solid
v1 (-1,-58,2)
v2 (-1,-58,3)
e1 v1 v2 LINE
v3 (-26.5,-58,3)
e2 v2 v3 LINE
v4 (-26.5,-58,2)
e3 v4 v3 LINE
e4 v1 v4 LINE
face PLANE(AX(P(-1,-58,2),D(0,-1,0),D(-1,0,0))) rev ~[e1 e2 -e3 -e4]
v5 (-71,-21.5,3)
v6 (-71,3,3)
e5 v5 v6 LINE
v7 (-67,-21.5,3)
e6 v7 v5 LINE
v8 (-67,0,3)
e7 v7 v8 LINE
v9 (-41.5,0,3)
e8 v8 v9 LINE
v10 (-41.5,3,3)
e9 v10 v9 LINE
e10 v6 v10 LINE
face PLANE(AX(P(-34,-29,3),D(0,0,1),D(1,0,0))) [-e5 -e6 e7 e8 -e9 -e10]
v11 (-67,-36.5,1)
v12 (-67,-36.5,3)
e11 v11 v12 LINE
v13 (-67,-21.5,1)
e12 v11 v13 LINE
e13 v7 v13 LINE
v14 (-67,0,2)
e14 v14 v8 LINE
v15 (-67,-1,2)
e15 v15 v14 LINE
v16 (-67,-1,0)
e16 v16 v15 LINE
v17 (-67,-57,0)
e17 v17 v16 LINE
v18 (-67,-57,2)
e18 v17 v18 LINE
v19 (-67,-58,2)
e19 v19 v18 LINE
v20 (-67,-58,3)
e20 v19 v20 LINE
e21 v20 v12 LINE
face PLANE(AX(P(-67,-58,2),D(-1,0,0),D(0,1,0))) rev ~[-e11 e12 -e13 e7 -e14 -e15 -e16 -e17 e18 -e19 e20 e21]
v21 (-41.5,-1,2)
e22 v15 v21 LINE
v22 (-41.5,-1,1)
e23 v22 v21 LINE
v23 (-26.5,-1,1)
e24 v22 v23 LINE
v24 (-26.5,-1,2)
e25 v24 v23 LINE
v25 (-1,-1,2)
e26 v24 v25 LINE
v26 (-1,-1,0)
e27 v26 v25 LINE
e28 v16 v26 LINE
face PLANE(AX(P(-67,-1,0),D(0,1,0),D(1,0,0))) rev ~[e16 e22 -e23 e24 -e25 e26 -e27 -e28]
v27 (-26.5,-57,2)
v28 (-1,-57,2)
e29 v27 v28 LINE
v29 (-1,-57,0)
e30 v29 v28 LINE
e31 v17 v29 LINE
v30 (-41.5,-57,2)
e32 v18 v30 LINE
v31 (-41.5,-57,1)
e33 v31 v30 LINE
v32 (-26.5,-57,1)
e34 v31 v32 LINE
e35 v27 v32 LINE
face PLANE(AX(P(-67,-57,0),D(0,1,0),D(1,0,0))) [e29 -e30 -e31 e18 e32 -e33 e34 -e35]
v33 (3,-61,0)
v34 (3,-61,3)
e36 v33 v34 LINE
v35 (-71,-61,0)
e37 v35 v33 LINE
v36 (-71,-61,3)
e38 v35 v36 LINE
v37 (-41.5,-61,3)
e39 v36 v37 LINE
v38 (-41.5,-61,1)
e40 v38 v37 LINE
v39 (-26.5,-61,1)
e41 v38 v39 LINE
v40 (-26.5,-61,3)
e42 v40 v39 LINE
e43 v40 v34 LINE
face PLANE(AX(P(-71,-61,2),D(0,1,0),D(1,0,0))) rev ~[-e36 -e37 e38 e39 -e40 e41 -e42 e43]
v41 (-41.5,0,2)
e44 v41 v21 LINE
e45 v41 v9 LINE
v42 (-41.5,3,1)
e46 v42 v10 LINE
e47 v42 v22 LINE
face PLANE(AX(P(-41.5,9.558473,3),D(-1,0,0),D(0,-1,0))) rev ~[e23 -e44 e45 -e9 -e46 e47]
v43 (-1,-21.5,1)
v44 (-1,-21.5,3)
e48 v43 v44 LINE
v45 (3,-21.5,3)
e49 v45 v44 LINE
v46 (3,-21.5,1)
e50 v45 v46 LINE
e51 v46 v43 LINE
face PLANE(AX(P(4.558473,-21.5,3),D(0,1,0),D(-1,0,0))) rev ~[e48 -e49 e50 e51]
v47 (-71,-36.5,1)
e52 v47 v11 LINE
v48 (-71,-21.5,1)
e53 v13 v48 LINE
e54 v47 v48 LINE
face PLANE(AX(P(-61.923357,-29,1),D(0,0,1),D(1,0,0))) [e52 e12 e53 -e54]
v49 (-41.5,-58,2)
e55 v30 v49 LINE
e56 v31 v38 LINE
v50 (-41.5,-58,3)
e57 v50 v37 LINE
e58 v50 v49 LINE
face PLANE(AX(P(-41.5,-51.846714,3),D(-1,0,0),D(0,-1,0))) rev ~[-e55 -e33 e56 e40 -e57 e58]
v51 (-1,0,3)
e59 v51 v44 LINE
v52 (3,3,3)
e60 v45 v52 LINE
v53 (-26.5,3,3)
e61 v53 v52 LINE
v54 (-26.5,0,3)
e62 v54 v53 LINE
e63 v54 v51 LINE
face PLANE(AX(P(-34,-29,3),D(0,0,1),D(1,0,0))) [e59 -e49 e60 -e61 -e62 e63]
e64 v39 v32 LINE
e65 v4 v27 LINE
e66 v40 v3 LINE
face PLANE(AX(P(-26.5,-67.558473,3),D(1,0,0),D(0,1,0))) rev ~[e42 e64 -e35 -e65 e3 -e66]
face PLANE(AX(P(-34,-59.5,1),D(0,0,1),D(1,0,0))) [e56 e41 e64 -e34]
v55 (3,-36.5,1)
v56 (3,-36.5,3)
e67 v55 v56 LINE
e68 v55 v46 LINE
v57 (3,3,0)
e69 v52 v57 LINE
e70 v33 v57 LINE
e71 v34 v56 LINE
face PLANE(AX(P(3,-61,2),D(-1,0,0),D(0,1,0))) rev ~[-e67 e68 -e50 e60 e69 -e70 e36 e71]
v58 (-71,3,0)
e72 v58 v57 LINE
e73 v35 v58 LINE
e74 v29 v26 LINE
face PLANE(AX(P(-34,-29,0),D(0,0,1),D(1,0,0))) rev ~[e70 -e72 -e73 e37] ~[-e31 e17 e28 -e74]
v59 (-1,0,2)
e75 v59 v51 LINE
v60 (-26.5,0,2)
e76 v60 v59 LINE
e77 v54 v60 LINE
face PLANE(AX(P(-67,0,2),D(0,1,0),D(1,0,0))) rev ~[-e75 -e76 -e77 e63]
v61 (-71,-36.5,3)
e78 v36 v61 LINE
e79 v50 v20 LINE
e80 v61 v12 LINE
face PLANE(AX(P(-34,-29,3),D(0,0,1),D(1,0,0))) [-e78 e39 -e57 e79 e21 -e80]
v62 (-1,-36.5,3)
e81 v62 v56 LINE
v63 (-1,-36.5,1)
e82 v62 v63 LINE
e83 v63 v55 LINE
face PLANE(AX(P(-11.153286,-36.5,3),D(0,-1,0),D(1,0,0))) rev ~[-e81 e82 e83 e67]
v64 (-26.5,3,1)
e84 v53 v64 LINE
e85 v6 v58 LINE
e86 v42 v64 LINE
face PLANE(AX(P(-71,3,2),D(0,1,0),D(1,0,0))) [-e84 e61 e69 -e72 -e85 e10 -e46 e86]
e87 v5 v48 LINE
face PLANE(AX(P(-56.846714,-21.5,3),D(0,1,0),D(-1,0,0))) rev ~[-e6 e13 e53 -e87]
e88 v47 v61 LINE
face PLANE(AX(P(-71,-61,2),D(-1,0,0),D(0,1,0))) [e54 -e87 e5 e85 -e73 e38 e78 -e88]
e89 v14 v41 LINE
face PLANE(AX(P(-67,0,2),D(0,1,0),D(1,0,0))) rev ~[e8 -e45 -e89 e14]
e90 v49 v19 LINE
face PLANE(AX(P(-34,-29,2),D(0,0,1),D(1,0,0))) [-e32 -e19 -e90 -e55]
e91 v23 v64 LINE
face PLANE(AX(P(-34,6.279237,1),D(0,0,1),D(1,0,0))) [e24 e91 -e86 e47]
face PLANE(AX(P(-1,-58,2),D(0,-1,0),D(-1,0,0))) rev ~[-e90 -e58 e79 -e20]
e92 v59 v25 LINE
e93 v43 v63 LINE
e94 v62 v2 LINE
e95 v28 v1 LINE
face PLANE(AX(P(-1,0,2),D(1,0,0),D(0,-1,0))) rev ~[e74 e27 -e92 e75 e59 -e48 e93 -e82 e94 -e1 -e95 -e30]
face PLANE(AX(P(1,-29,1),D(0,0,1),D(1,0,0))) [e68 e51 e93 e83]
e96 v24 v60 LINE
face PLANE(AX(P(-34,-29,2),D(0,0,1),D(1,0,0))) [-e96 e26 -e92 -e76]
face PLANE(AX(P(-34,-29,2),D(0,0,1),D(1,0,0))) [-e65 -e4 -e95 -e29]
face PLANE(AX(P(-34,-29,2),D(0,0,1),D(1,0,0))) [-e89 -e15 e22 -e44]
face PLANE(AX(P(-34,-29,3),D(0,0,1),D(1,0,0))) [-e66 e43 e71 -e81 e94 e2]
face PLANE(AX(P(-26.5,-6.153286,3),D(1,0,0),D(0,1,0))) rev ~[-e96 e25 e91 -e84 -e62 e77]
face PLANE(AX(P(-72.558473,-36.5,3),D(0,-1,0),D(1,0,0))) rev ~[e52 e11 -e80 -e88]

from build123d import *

# Parameters (mm, degrees)
F0_W     = 74
F0_H     = 64
F0_W_2   = 68
F0_H_2   = 58
F0_W_3   = 66
F0_H_3   = 56
F1_DEPTH = 2
F2_W     = 74
F2_H     = 64
F3_DEPTH = 1
F4_W     = 15
F4_H     = 6.5584733043
F4_H_2   = 3
F4_H_3   = 6.1532862581
F4_W_2   = 4
F4_H_4   = 15
F4_W_3   = 1.5584733043
F4_W_4   = 10.1532862581
F5_DEPTH = 2


with BuildPart() as f1:
    # F0 (on Top) → F1 (new body)
    with BuildSketch(Plane.XY):
        with Locations((-34, -29)):
            Rectangle(F0_W, F0_H)
        with Locations((-34, -29)):
            Rectangle(F0_W_2, F0_H_2, mode=Mode.SUBTRACT)
        with Locations((-34, -29)):
            Rectangle(F0_W_2, F0_H_2)
        with Locations((-34, -29)):
            Rectangle(F0_W_3, F0_H_3, mode=Mode.SUBTRACT)
    extrude(amount=F1_DEPTH)

    # F2 (on face) → F3 (join)
    with BuildSketch(Plane.XY.offset(2)):
        with Locations((-34, -29)):
            Rectangle(F2_W, F2_H)
        Polygon((-67, 0), (-1, 0), (-1, -1), (-1, -57), (-1, -58), (-67, -58), (-67, -57), (-67, -1), align=None, mode=Mode.SUBTRACT)
    extrude(amount=F3_DEPTH)

    # F4 (on face) → F5 (cut)
    with BuildSketch(Plane.XY.offset(3)):
        with Locations((-34, 6.2792366521)):
            Rectangle(F4_W, F4_H)
        with Locations((-34, 1.5)):
            Rectangle(F4_W, F4_H_2)
        with Locations((-34, -3.0766431291)):
            Rectangle(F4_W, F4_H_3)
        with Locations((1, -29)):
            Rectangle(F4_W_2, F4_H_4)
        with Locations((3.7792366521, -29)):
            Rectangle(F4_W_3, F4_H_4)
        with Locations((-6.0766431291, -29)):
            Rectangle(F4_W_4, F4_H_4)
        with Locations((-34, -59.5)):
            Rectangle(F4_W, F4_H_2)
        with Locations((-34, -54.9233568709)):
            Rectangle(F4_W, F4_H_3)
        with Locations((-34, -64.2792366521)):
            Rectangle(F4_W, F4_H)
        with Locations((-61.9233568709, -29)):
            Rectangle(F4_W_4, F4_H_4)
        with Locations((-69, -29)):
            Rectangle(F4_W_2, F4_H_4)
        with Locations((-71.7792366521, -29)):
            Rectangle(F4_W_3, F4_H_4)
    extrude(amount=-F5_DEPTH, mode=Mode.SUBTRACT)


solid = f1.part
